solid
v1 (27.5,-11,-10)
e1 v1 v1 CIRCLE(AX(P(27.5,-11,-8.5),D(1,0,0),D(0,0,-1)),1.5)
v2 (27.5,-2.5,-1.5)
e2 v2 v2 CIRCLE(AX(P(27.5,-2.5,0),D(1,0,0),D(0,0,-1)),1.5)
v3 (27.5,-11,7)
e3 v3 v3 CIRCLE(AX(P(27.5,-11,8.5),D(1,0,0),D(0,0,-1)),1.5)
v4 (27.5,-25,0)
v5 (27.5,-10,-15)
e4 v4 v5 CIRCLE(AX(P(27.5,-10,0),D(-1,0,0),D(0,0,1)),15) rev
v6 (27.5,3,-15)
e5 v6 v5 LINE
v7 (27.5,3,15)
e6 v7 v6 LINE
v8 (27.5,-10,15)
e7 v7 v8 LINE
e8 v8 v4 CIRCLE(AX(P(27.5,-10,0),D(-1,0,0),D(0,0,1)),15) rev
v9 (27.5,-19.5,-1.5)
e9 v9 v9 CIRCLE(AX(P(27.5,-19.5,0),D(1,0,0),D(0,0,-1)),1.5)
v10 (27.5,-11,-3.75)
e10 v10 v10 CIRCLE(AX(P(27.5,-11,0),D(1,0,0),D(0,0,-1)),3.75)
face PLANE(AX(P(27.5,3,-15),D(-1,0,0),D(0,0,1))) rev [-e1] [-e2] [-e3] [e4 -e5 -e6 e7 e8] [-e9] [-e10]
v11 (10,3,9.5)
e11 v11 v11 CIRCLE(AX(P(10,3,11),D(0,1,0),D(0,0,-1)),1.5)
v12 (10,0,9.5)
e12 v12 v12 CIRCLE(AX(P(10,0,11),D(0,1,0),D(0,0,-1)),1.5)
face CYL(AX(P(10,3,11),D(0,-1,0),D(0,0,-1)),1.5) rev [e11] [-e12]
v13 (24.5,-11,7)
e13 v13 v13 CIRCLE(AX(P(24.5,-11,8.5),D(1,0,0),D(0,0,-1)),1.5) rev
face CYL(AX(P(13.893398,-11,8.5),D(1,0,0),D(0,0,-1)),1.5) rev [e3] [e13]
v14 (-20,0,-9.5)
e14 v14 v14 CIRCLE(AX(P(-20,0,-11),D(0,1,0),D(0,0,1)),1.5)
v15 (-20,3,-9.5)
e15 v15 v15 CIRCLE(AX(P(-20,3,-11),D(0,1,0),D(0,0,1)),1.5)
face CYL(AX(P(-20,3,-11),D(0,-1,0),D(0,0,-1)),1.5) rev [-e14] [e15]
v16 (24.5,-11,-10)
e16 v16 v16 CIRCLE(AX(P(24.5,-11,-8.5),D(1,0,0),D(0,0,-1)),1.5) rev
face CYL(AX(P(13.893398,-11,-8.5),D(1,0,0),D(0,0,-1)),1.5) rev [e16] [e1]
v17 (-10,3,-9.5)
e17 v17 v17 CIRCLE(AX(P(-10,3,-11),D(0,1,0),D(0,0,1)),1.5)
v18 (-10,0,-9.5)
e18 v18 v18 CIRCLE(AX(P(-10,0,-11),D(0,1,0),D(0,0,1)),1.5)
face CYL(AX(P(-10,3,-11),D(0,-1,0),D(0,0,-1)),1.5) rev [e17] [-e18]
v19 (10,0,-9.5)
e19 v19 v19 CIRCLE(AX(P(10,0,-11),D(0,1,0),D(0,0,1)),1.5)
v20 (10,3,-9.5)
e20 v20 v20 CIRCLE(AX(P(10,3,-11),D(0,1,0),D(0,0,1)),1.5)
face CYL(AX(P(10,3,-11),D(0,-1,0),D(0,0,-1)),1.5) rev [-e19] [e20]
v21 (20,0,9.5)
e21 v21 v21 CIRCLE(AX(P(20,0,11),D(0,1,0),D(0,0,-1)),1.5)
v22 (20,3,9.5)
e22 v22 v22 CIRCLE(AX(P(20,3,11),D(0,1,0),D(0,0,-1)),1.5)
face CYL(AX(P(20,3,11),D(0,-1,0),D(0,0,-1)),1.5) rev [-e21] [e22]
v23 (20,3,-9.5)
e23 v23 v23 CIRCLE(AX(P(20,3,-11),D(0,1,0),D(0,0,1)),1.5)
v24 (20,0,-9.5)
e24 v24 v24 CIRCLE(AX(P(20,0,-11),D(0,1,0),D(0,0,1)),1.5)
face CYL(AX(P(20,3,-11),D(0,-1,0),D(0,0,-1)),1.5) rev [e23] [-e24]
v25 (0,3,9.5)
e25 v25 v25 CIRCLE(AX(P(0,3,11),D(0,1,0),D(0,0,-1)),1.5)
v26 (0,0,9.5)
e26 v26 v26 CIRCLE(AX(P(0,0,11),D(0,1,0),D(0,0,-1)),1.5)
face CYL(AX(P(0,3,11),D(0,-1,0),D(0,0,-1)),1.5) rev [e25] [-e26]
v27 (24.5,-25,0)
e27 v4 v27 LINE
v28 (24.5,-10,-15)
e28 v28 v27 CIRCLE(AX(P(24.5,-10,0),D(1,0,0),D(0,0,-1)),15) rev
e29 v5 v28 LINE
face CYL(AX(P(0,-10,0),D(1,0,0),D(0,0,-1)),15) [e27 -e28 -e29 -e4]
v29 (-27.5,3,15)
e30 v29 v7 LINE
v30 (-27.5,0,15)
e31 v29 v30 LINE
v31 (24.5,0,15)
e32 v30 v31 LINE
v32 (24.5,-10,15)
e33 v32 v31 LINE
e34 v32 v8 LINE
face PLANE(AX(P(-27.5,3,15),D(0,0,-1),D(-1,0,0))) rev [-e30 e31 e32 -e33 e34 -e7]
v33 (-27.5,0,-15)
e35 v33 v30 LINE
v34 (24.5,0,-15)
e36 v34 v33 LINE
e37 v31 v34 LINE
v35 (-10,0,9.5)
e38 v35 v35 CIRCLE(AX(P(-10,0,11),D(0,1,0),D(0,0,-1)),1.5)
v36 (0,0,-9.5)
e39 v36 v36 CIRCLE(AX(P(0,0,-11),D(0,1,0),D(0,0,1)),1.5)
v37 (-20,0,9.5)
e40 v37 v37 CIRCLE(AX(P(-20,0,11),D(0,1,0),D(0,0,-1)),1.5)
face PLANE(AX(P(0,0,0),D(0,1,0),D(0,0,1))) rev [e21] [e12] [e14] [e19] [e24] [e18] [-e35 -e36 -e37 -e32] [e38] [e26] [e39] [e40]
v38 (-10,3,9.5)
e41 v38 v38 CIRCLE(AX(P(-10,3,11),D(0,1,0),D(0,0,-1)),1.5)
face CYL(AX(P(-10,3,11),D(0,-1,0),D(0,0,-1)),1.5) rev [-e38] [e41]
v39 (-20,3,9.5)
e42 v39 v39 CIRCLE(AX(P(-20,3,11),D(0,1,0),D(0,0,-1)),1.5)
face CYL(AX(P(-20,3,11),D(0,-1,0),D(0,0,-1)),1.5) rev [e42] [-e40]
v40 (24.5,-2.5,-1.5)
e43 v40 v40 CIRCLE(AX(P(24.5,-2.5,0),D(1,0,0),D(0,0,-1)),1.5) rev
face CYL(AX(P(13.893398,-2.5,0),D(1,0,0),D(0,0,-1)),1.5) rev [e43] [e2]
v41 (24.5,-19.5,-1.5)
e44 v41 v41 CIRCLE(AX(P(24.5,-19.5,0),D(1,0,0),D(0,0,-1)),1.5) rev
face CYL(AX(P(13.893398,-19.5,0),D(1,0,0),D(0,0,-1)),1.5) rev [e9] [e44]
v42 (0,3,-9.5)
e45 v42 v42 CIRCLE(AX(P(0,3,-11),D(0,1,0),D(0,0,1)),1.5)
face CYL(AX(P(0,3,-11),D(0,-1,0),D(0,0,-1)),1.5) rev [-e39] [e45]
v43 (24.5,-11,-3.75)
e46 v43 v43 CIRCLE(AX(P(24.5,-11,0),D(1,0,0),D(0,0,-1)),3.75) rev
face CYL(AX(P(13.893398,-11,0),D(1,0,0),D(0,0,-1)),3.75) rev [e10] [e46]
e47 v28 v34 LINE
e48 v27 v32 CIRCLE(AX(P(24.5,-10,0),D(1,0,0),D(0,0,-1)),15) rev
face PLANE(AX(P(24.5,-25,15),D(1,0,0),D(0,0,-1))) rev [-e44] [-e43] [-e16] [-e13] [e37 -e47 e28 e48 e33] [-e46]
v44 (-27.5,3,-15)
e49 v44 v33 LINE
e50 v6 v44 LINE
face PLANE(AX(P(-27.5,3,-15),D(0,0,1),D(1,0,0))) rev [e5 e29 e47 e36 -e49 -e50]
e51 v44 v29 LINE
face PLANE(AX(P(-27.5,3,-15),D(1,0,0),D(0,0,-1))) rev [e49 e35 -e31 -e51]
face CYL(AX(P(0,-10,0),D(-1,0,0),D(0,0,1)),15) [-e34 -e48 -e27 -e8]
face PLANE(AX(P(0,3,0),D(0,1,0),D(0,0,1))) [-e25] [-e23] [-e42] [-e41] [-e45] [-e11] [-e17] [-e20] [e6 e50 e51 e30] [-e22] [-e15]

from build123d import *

# Parameters (mm, degrees)
SKETCH1_W           = 55
SKETCH1_H           = 30
SKETCH1_R           = 1.5
BOSS_EXTRUDE1_DEPTH = 3
SKETCH2_W           = 3
SKETCH2_H           = 30
BOSS_EXTRUDE2_DEPTH = 25
SKETCH3_R           = 1.5
SKETCH3_R_2         = 3.75
CUT_EXTRUDE1_DEPTH  = 3
FILLET1_R           = 15


with BuildPart() as part:
    # Sketch1 → Boss-Extrude1 (new body)
    with BuildSketch(Plane(origin=(0, 0, 0), x_dir=(1, 0, 0), z_dir=(0, 1, 0))):
        Rectangle(SKETCH1_W, SKETCH1_H)
        with Locations(Location((20, 11, 0), (0, 0, 270))):
            Circle(SKETCH1_R, mode=Mode.SUBTRACT)
        with Locations(Location((10, 11, 0), (0, 0, 270))):
            Circle(SKETCH1_R, mode=Mode.SUBTRACT)
        with Locations(Location((0, 11, 0), (0, 0, 270))):
            Circle(SKETCH1_R, mode=Mode.SUBTRACT)
        with Locations(Location((-10, 11, 0), (0, 0, 270))):
            Circle(SKETCH1_R, mode=Mode.SUBTRACT)
        with Locations(Location((-20, 11, 0), (0, 0, 270))):
            Circle(SKETCH1_R, mode=Mode.SUBTRACT)
        with Locations(Location((20, -11, 0), (0, 0, 90))):
            Circle(SKETCH1_R, mode=Mode.SUBTRACT)
        with Locations(Location((10, -11, 0), (0, 0, 90))):
            Circle(SKETCH1_R, mode=Mode.SUBTRACT)
        with Locations(Location((0, -11, 0), (0, 0, 90))):
            Circle(SKETCH1_R, mode=Mode.SUBTRACT)
        with Locations(Location((-10, -11, 0), (0, 0, 90))):
            Circle(SKETCH1_R, mode=Mode.SUBTRACT)
        with Locations(Location((-20, -11, 0), (0, 0, 90))):
            Circle(SKETCH1_R, mode=Mode.SUBTRACT)
    extrude(amount=BOSS_EXTRUDE1_DEPTH)

    # Sketch2 → Boss-Extrude2 (add)
    with BuildSketch(Plane.XZ):
        with Locations((26, 0)):
            Rectangle(SKETCH2_W, SKETCH2_H)
    extrude(amount=BOSS_EXTRUDE2_DEPTH)

    # Sketch3 → Cut-Extrude1 (cut)
    with BuildSketch(Plane(origin=(27.5, 0, 0), x_dir=(0, 0, -1), z_dir=(1, 0, 0))):
        with Locations((0, -19.5)):
            Circle(SKETCH3_R)
        with Locations((-8.5, -11)):
            Circle(SKETCH3_R)
        with Locations((0, -2.5)):
            Circle(SKETCH3_R)
        with Locations((8.5, -11)):
            Circle(SKETCH3_R)
        with Locations((0, -11)):
            Circle(SKETCH3_R_2)
    extrude(amount=-CUT_EXTRUDE1_DEPTH, mode=Mode.SUBTRACT)

    # Fillet1
    fillet1_edges = [part.edges().sort_by_distance(p)[0] for p in [
        (26, -25, -15),
        (26, -25, 15),
    ]]
    fillet(fillet1_edges, radius=FILLET1_R - 0.0001)  # a hair under: the kernel refuses the full size


solid = part.part
